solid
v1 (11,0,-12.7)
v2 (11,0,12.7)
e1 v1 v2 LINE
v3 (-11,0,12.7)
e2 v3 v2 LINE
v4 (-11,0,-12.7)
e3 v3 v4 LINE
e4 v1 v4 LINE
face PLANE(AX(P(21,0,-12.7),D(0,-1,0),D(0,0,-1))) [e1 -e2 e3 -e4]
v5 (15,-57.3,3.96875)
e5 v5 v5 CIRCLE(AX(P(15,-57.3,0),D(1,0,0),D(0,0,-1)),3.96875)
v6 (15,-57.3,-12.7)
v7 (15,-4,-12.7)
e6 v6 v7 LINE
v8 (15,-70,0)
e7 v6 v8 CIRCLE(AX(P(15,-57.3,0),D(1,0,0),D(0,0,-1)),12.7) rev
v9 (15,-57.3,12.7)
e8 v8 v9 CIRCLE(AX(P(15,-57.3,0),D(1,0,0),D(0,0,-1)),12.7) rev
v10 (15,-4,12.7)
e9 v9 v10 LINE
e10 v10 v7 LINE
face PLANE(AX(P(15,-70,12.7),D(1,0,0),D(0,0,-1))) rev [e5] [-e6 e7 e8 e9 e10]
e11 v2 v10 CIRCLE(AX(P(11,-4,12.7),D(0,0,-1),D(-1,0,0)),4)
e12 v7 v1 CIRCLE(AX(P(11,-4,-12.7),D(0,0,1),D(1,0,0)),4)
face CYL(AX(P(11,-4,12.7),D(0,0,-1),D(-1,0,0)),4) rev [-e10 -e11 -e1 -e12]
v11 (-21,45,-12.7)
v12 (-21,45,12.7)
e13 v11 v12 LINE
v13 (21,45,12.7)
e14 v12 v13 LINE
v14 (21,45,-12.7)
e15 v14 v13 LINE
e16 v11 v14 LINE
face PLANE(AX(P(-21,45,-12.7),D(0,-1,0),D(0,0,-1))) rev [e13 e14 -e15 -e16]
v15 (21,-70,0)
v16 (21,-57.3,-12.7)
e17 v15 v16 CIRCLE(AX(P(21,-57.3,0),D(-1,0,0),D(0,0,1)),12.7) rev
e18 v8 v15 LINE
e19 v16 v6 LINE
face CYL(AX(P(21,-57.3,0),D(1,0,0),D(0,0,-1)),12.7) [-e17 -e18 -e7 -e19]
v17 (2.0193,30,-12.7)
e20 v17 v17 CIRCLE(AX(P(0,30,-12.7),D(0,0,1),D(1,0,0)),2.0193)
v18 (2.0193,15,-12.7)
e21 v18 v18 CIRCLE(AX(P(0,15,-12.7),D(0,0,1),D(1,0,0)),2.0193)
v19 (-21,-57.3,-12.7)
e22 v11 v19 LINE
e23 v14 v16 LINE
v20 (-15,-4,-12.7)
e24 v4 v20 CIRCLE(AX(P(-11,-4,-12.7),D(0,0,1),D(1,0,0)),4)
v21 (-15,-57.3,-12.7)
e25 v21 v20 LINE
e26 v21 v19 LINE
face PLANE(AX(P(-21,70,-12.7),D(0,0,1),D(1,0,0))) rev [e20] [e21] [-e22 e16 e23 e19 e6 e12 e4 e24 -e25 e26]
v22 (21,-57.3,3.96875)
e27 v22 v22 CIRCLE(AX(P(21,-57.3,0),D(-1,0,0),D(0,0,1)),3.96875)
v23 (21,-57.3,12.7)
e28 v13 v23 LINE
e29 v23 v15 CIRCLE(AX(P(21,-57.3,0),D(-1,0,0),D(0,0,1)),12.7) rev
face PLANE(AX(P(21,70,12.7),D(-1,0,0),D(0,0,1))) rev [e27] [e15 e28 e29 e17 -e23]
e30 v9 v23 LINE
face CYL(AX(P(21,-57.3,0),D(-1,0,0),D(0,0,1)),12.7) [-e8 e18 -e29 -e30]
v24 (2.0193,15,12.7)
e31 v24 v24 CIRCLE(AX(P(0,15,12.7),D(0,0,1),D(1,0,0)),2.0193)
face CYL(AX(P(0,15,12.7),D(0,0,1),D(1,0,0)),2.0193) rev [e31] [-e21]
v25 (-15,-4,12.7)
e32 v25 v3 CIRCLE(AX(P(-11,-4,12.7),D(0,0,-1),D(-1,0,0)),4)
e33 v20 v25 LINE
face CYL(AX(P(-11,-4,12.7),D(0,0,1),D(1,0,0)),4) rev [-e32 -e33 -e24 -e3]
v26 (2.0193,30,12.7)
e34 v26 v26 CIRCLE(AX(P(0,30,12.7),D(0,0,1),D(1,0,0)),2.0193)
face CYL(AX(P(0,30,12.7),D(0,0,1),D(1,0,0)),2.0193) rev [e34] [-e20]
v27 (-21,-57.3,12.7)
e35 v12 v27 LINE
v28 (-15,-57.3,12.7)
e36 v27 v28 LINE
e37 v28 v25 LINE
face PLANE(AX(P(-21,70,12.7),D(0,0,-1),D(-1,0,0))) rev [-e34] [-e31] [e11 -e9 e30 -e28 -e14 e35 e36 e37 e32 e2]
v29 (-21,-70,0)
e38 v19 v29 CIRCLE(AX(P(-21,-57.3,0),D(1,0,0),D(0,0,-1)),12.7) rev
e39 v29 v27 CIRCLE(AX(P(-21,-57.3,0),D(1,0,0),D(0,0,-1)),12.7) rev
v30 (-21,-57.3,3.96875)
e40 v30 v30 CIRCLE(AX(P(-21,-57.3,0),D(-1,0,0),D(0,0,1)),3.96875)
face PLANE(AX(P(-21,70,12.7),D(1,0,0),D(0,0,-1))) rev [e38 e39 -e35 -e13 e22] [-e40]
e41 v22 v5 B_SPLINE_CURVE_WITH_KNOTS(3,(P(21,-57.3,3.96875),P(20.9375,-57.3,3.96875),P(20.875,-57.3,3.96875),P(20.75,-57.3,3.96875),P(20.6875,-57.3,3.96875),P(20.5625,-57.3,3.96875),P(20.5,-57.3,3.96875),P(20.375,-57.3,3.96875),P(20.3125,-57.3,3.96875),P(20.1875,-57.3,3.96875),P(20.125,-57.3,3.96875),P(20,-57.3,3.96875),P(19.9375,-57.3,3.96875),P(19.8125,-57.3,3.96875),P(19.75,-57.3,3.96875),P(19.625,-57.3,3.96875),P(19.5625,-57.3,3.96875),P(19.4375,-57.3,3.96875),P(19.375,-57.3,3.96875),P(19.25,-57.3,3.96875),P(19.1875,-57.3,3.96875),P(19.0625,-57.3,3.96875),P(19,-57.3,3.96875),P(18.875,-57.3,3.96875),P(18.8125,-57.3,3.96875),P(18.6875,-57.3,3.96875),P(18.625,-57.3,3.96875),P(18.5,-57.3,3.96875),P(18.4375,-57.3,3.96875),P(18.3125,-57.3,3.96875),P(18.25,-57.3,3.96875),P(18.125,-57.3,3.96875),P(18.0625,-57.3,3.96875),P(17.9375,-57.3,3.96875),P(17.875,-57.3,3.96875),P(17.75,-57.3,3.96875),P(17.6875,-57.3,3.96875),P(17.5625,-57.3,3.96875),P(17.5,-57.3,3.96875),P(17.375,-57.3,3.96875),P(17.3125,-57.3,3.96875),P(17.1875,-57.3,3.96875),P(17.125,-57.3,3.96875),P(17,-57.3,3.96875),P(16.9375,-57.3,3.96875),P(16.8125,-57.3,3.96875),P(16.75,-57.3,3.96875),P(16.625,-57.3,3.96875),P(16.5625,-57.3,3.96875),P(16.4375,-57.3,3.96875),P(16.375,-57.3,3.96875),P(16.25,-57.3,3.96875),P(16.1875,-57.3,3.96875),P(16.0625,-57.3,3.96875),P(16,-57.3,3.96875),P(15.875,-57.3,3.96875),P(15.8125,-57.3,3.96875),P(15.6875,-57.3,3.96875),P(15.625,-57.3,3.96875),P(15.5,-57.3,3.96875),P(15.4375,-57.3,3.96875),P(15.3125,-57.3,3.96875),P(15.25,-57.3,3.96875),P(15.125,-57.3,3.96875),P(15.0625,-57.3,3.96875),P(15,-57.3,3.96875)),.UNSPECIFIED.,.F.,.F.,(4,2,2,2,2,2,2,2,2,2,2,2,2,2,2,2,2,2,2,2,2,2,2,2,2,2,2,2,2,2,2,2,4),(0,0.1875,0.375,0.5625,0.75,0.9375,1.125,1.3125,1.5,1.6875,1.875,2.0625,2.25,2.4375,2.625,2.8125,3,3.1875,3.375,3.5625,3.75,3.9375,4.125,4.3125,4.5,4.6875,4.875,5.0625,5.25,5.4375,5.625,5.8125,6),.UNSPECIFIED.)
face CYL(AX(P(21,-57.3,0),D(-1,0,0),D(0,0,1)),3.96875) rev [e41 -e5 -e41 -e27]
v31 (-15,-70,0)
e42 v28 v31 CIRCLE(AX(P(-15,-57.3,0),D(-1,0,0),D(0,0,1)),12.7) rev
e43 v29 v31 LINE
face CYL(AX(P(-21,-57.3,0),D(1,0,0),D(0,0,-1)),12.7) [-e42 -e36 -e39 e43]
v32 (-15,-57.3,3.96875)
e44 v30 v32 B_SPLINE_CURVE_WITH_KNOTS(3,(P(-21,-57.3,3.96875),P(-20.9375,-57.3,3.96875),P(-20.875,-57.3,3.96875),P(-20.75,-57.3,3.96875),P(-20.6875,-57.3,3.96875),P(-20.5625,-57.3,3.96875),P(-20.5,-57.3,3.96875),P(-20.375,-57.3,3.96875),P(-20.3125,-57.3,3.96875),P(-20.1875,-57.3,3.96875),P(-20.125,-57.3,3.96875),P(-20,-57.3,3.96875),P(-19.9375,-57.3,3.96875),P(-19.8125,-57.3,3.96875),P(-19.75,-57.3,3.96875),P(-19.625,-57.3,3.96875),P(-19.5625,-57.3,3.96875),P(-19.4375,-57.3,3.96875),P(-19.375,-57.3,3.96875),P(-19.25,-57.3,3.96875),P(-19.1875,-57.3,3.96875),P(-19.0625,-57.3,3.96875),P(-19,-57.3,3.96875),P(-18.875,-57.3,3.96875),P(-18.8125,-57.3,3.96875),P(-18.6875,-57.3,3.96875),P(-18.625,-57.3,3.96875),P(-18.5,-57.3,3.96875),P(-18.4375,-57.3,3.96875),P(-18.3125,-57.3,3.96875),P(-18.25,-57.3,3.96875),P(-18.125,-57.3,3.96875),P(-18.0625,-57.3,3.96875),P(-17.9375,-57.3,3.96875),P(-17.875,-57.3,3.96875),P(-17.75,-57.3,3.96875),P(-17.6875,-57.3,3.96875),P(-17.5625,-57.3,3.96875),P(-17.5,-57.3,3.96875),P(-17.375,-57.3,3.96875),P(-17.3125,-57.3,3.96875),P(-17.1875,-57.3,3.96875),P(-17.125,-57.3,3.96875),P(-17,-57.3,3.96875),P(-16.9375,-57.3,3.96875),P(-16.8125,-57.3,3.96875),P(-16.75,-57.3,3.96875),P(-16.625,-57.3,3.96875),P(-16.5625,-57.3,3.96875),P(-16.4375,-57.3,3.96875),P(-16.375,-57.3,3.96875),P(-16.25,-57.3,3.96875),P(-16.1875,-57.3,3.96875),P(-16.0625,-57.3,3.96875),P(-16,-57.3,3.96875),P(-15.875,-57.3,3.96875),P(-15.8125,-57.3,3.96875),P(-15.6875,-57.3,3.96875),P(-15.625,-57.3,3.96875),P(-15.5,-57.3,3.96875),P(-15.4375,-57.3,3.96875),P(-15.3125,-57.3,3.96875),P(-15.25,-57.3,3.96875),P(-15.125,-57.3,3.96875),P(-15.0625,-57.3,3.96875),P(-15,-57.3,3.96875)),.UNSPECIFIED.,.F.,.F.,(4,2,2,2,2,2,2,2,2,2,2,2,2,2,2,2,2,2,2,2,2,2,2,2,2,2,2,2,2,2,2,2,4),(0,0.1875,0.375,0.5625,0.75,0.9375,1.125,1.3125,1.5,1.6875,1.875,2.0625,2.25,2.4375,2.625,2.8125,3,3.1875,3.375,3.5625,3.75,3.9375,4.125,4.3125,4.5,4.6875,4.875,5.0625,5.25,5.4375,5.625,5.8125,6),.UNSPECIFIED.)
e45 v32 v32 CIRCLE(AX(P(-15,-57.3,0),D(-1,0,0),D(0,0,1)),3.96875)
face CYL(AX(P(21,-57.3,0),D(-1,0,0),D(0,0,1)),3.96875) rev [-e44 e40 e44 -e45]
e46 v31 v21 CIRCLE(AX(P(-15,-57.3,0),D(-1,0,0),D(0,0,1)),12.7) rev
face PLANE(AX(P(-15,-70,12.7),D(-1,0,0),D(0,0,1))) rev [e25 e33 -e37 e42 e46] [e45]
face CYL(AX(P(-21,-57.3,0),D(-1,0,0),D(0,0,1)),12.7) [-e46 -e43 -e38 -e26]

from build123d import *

# Parameters (mm, degrees)
SKETCH_1_W            = 42
SKETCH_1_H            = 25.4
EXTRUDE_1_DEPTH       = 70
SKETCH_5_W            = 6
SKETCH_5_H            = 25.4
EXTRUDE_5_DEPTH       = 70
SKETCH_6_R            = 3.96875
CUT_EXTRUDE_2_DEPTH   = 83.61531335
FILLET_6_R            = 4
HOLE_WIZARD_10_32_1_D = 4.0386
FILLET_7_R            = 12.7
SKETCH_9_W            = 42
SKETCH_9_H            = 25
CUT_EXTRUDE_3_DEPTH   = 78.370278531


with BuildPart() as part:
    # 草圖1 → 填料-伸長1 (new body)
    with BuildSketch(Plane(origin=(0, 0, 0), x_dir=(1, 0, 0), z_dir=(0, 1, 0))):
        Rectangle(SKETCH_1_W, SKETCH_1_H)
    extrude(amount=EXTRUDE_1_DEPTH)

    # 草圖5 → 填料-伸長5 (add)
    with BuildSketch(Plane.XZ):
        with Locations((-18, 0)):
            Rectangle(SKETCH_5_W, SKETCH_5_H)
        with Locations((18, 0)):
            Rectangle(SKETCH_5_W, SKETCH_5_H)
    extrude(amount=EXTRUDE_5_DEPTH)

    # 草圖6 → 除料-伸長2 (cut, through all)
    with BuildSketch(Plane.ZY.offset(21)):
        with Locations((0, -57.3)):
            Circle(SKETCH_6_R)
    extrude(amount=-CUT_EXTRUDE_2_DEPTH, mode=Mode.SUBTRACT)

    # 圓角6
    fillet_6_edges = [part.edges().sort_by_distance(p)[0] for p in [
        (15, 0, 0),
        (-15, 0, 0),
    ]]
    fillet(fillet_6_edges, radius=FILLET_6_R)

    # #10-32 螺紋孔1 (through all)
    with Locations(Plane.XY.offset(12.7)):
        with Locations((0, 30), (0, 15)):
            Hole(HOLE_WIZARD_10_32_1_D / 2)

    # 圓角7
    fillet_7_edges = [part.edges().sort_by_distance(p)[0] for p in [
        (18, -70, 12.7),
        (18, -70, -12.7),
        (-18, -70, 12.7),
        (-18, -70, -12.7),
    ]]
    fillet(fillet_7_edges, radius=FILLET_7_R - 0.0001)  # a hair under: the kernel refuses the full size

    # 草圖9 → 除料-伸長3 (cut, through all)
    with BuildSketch(Plane.XY.offset(12.7)):
        with Locations((0, 57.5)):
            Rectangle(SKETCH_9_W, SKETCH_9_H)
    extrude(amount=-CUT_EXTRUDE_3_DEPTH, mode=Mode.SUBTRACT)


solid = part.part
